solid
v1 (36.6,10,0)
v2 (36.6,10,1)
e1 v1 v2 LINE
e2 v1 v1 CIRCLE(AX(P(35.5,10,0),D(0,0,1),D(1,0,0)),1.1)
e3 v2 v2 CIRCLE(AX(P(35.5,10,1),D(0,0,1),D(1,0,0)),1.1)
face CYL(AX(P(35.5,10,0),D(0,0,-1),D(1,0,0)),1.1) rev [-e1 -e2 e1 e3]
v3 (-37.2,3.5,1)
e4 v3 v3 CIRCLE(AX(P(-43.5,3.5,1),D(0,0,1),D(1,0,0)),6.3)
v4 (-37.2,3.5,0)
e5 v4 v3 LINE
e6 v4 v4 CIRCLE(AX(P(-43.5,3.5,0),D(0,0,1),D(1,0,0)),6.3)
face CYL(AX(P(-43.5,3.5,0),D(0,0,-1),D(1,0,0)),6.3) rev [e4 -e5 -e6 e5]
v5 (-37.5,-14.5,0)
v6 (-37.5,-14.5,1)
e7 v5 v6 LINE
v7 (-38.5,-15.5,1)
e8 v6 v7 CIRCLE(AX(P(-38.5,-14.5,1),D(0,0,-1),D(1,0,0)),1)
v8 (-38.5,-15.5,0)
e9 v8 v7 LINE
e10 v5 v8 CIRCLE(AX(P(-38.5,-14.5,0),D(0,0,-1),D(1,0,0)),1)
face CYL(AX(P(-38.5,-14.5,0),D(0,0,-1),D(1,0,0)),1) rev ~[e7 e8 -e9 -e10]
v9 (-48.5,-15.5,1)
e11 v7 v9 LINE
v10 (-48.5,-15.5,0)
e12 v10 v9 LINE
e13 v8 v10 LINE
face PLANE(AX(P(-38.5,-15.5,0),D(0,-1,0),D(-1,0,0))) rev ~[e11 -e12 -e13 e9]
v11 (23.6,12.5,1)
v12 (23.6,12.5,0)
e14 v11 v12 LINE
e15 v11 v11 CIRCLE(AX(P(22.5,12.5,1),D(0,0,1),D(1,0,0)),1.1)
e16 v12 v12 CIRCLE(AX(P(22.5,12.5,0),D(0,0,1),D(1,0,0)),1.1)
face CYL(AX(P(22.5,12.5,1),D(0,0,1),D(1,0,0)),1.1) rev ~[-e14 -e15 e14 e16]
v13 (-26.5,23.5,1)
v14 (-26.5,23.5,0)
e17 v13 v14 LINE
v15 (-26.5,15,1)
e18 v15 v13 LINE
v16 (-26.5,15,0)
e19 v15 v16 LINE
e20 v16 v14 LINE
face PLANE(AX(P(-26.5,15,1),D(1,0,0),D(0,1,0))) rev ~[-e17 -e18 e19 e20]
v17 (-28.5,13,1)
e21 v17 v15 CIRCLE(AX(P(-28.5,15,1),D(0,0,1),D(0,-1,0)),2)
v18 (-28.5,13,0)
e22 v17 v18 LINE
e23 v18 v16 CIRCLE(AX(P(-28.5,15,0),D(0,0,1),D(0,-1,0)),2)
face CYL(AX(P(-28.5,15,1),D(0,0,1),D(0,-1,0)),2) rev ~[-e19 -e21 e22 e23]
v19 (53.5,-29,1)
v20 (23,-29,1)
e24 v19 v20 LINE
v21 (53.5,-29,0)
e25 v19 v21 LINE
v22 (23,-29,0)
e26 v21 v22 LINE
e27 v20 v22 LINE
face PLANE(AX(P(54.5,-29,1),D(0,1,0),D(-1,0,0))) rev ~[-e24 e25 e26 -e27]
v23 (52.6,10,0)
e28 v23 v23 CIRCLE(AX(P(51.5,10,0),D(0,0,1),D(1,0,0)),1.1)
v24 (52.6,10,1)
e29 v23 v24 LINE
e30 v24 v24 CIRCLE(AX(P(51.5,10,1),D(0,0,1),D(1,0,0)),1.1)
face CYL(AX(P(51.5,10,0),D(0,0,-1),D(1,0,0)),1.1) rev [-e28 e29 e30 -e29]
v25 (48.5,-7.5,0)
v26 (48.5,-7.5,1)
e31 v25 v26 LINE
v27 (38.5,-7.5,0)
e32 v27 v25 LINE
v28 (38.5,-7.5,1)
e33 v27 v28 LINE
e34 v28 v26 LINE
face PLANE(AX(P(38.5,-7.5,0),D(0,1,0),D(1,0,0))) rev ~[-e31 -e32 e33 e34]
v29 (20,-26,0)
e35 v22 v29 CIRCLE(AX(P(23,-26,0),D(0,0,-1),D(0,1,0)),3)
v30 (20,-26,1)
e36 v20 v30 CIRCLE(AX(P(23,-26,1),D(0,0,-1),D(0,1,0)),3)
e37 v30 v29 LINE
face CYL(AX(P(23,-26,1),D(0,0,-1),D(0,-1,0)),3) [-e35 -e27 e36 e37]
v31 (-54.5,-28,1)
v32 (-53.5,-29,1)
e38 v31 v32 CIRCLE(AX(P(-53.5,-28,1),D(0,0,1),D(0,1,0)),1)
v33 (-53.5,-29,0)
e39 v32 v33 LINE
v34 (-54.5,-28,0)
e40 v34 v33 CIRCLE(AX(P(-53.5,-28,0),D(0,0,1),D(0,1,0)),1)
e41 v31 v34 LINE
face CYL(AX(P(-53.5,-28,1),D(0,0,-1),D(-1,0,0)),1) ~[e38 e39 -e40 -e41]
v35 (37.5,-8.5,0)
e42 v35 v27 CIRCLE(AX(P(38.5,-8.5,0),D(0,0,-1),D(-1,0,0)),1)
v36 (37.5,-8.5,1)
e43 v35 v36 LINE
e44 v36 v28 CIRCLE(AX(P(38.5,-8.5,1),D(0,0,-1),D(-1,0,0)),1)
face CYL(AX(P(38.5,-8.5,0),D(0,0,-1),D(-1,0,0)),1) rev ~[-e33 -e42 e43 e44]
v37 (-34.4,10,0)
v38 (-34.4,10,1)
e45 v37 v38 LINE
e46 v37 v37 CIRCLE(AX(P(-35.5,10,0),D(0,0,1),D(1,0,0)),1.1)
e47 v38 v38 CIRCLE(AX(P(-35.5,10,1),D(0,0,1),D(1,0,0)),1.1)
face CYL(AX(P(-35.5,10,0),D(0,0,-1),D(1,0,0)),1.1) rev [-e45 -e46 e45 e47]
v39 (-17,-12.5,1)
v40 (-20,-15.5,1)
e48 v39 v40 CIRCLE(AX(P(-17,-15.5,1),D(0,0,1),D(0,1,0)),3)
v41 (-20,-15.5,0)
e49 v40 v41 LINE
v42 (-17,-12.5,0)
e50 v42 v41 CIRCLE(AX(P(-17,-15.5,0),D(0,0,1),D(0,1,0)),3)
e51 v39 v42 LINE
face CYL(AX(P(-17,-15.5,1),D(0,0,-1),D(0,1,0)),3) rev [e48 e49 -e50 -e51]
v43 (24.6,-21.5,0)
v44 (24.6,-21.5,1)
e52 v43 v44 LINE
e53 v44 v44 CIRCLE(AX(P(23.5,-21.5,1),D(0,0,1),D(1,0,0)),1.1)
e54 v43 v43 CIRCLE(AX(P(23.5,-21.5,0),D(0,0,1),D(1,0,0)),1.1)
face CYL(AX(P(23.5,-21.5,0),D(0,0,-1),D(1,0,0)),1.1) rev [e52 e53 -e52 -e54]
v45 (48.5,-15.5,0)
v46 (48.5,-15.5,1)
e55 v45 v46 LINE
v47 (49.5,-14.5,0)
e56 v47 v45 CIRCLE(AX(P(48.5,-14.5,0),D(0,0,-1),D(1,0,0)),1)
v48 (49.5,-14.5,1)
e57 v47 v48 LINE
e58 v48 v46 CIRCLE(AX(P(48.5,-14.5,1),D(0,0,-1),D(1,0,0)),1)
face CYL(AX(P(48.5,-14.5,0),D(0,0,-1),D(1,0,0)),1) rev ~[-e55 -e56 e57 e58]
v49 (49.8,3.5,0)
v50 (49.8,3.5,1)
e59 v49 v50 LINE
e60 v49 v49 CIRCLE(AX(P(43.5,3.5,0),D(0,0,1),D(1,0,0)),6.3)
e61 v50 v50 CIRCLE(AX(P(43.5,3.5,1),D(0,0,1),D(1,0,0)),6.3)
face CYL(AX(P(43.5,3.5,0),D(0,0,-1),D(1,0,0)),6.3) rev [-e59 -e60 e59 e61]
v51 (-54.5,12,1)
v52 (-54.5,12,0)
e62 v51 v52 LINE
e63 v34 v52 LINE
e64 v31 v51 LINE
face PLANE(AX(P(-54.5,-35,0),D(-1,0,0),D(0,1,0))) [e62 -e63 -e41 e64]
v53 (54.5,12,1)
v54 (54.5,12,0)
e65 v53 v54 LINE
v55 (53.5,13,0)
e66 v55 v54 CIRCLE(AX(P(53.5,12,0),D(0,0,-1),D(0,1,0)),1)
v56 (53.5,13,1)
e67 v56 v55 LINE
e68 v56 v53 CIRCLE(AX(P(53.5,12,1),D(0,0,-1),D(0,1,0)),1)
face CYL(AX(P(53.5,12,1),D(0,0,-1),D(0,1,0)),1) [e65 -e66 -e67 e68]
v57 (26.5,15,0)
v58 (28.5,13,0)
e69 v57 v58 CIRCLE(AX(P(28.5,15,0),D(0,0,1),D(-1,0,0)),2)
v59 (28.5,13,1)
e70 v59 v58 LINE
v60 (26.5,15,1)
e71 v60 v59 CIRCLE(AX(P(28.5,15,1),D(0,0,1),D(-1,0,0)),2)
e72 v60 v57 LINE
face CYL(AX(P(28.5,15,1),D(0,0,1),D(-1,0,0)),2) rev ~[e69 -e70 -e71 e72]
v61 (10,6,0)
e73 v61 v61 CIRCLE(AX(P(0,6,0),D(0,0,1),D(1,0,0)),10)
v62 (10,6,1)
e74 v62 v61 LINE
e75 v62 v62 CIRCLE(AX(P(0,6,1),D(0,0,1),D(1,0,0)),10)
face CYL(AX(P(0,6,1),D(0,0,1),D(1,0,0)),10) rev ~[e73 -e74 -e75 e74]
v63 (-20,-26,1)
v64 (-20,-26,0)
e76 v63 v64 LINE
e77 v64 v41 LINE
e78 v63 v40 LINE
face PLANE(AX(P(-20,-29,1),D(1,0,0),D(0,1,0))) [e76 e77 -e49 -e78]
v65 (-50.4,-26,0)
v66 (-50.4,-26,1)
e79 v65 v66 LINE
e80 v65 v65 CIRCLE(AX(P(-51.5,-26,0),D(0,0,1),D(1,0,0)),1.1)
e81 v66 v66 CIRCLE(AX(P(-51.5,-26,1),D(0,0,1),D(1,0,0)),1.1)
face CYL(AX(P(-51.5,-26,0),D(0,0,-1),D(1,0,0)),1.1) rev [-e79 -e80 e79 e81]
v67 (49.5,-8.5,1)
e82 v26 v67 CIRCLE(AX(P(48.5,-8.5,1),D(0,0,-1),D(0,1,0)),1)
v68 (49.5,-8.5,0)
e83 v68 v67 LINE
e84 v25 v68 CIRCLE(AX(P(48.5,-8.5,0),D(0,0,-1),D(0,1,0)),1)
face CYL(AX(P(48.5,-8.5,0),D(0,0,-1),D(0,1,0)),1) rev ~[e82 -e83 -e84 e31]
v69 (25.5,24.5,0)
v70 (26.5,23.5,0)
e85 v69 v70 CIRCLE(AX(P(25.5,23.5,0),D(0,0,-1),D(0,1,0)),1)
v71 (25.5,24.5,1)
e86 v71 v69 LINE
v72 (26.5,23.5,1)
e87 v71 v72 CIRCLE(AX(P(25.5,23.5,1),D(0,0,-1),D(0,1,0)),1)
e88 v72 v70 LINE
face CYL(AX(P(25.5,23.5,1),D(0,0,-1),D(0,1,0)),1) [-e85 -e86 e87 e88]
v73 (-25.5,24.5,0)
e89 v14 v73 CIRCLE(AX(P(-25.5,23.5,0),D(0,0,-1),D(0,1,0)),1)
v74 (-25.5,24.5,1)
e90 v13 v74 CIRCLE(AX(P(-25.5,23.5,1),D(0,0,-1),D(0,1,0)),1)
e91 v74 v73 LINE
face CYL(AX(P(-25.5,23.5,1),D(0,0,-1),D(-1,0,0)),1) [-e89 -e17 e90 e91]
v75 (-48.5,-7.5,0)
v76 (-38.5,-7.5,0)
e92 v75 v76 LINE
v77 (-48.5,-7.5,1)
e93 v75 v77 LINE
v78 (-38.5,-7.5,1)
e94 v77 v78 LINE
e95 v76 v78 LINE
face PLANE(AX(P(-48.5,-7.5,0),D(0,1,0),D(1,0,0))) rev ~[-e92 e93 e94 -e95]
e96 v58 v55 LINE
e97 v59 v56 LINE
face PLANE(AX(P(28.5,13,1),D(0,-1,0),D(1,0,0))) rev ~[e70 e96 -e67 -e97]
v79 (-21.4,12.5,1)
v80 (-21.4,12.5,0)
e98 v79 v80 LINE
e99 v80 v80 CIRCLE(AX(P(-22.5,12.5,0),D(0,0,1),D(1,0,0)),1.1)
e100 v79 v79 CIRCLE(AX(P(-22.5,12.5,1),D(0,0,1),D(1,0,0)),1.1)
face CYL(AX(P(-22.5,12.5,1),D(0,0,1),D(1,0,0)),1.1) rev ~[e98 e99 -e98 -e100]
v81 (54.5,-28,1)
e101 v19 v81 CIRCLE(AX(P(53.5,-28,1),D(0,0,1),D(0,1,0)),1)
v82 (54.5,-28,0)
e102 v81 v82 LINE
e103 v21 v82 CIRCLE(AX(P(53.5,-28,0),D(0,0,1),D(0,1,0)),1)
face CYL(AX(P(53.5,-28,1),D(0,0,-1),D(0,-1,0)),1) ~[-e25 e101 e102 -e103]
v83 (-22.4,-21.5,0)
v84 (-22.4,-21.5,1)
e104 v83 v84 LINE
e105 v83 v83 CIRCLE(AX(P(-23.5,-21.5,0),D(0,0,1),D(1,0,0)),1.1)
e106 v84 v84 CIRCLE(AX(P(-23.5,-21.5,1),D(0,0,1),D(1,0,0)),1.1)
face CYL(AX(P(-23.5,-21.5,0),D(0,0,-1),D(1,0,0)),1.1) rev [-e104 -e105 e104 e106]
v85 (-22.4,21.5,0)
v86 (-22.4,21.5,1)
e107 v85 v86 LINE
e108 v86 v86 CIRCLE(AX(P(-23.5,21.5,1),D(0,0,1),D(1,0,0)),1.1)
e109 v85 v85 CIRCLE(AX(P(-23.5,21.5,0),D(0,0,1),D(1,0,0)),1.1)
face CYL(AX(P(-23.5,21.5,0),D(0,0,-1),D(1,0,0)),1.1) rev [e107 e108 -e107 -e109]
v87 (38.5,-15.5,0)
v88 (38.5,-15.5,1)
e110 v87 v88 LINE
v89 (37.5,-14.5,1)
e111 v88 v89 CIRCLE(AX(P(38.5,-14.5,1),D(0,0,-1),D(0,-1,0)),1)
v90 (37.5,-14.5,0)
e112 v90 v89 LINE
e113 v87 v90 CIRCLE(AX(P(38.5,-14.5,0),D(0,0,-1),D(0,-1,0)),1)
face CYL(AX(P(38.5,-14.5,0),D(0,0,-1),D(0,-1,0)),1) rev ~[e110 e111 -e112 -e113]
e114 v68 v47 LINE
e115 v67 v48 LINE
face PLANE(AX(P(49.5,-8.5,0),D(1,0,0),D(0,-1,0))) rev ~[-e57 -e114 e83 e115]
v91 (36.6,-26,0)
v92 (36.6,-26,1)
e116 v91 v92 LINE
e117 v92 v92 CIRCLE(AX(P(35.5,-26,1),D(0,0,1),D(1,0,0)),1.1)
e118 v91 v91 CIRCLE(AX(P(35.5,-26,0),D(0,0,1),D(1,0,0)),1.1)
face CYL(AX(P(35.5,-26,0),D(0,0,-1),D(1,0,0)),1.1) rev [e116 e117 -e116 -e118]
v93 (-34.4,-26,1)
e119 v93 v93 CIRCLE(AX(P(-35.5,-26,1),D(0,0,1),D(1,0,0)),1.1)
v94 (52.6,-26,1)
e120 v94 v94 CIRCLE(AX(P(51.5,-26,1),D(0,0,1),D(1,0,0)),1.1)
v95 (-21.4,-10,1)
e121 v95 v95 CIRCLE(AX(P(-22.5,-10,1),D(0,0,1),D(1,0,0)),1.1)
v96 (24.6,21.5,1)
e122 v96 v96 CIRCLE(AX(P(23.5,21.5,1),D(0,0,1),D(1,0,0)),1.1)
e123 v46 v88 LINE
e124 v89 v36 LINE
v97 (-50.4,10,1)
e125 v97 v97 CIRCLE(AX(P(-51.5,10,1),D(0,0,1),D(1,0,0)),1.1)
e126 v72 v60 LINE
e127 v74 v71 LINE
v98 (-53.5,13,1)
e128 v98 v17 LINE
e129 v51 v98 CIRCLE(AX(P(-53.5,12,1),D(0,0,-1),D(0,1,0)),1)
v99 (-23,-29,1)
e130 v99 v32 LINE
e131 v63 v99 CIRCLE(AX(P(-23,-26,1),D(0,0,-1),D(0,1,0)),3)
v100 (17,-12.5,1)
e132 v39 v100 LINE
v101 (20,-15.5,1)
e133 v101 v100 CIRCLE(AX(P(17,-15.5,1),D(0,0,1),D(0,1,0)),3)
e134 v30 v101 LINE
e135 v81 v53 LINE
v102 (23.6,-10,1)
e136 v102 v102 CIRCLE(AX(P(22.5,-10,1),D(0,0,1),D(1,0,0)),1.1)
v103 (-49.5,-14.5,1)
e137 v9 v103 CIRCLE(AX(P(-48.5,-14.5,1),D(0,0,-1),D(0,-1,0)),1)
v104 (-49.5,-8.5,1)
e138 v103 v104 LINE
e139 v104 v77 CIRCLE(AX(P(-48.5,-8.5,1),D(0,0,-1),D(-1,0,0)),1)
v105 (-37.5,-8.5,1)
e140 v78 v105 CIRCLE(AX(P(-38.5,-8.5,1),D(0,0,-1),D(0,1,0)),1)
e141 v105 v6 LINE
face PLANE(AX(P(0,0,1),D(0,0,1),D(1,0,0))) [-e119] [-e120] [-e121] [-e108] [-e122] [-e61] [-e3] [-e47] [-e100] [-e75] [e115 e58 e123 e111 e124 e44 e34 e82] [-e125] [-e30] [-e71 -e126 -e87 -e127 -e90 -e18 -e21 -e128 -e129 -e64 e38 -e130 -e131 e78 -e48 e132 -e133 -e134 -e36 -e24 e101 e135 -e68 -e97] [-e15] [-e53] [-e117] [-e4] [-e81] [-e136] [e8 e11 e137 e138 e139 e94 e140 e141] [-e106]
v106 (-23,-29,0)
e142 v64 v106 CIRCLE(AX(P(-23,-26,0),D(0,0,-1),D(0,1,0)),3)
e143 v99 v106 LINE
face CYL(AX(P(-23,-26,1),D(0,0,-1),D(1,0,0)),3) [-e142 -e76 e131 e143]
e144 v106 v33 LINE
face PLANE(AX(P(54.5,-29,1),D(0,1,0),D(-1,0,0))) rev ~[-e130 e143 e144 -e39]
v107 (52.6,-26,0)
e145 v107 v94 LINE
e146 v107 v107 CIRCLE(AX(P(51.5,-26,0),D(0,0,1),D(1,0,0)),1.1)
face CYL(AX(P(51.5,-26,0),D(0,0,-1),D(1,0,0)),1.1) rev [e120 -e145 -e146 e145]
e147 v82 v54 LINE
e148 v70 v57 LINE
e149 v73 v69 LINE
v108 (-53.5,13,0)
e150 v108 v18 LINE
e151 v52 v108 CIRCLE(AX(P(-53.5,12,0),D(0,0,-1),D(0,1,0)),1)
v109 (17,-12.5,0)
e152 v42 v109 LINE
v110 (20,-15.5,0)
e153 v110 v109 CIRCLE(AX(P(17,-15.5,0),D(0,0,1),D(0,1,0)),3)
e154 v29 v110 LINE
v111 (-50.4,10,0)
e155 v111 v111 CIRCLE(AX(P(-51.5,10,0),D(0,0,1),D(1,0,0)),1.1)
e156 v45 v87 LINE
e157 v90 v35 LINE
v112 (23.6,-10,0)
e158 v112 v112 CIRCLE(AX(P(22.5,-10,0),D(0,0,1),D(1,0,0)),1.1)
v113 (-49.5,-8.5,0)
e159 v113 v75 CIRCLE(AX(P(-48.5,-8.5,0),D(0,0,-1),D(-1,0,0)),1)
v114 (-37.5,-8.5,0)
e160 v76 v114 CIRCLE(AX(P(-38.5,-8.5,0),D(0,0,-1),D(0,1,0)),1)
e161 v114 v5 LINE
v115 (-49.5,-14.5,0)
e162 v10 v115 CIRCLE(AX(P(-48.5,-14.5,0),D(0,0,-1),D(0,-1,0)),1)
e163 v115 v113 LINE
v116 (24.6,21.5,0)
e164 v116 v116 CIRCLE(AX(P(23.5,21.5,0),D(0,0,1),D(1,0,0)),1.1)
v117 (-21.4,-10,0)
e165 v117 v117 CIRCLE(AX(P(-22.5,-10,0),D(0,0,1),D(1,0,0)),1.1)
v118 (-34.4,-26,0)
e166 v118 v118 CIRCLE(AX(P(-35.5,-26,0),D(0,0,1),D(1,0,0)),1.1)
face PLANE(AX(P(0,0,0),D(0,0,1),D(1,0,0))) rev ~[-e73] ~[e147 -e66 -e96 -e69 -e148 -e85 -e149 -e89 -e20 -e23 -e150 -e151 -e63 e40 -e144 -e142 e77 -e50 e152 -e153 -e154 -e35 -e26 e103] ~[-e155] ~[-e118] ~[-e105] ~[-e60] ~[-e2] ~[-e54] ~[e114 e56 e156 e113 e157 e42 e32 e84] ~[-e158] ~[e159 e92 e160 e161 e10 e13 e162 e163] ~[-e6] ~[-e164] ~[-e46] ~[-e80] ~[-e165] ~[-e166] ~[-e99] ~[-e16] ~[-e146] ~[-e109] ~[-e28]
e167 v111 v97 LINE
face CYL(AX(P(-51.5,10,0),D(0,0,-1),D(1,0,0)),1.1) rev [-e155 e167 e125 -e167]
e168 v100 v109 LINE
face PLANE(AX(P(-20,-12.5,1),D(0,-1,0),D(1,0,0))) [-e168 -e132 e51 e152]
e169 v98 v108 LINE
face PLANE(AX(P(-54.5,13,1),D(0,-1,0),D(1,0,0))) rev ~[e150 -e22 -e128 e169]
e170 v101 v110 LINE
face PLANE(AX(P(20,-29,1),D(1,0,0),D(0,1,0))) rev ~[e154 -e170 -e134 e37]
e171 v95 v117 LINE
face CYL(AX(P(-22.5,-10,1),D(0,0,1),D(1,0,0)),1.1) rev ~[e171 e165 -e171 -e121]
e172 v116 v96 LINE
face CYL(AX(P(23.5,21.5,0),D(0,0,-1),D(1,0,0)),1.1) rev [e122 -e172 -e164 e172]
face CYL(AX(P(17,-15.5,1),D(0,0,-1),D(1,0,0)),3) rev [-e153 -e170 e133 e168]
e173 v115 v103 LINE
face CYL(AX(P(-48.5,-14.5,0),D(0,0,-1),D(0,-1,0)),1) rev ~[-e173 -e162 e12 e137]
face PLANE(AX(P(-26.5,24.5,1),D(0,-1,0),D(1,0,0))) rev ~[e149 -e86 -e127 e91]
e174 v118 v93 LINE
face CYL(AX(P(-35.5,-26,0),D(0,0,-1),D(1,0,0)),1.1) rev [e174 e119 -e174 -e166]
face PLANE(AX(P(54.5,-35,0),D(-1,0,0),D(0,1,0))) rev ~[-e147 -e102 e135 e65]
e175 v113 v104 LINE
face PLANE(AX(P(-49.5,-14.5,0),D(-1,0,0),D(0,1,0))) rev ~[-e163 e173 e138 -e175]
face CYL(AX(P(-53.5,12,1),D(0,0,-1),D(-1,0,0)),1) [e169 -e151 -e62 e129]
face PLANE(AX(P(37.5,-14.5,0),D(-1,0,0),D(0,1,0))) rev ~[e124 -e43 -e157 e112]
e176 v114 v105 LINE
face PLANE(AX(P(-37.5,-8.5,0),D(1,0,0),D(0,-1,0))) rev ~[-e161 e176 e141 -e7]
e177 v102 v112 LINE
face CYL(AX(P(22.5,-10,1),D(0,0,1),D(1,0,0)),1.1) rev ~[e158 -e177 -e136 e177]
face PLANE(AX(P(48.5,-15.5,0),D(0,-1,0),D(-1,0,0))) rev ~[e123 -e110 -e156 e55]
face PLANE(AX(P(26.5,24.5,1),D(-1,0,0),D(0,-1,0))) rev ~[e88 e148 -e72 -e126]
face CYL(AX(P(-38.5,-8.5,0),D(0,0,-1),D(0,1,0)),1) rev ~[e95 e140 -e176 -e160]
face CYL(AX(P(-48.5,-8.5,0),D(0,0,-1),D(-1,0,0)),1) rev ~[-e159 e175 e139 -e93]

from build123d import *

# Parameters (mm, degrees)
F0_W     = 109
F0_H     = 70
F0_R     = 1.1
F0_R_2   = 6.3
F1_DEPTH = 1
F2_W     = 53
F2_H     = 10.5
F3_DEPTH = 1
F5_DEPTH = 1
F6_R     = 1
F7_R     = 1.1
F7_W     = 40
F7_H     = 16.5
F7_R_2   = 10
F8_DEPTH = 1
F9_R     = 3


# Not quite as in the source:
# - a feature names something its author has since deleted; it is built from what else it names


with BuildPart() as f1:
    # F0 (on Top) → F1 (new body)
    with BuildSketch(Plane.XY):
        Rectangle(F0_W, F0_H)
        with Locations((-51.5, -26)):
            Circle(F0_R, mode=Mode.SUBTRACT)
        with Locations((-35.5, -26)):
            Circle(F0_R, mode=Mode.SUBTRACT)
        with Locations((-23.5, -21.5)):
            Circle(F0_R, mode=Mode.SUBTRACT)
        with BuildLine():
            ThreePointArc((-37.5, -14.5), (-37.7928932188, -15.2071067812), (-38.5, -15.5))
            Line((-38.5, -15.5), (-48.5, -15.5))
            ThreePointArc((-48.5, -15.5), (-49.2071067812, -15.2071067812), (-49.5, -14.5))
            Line((-49.5, -14.5), (-49.5, -8.5))
            ThreePointArc((-49.5, -8.5), (-49.2071067812, -7.7928932188), (-48.5, -7.5))
            Line((-48.5, -7.5), (-38.5, -7.5))
            ThreePointArc((-38.5, -7.5), (-37.7928932188, -7.7928932188), (-37.5, -8.5))
            Line((-37.5, -8.5), (-37.5, -14.5))
        make_face(mode=Mode.SUBTRACT)
        with Locations((23.5, -21.5)):
            Circle(F0_R, mode=Mode.SUBTRACT)
        with Locations((35.5, -26)):
            Circle(F0_R, mode=Mode.SUBTRACT)
        with Locations((51.5, -26)):
            Circle(F0_R, mode=Mode.SUBTRACT)
        with BuildLine():
            Line((38.5, -7.5), (48.5, -7.5))
            ThreePointArc((48.5, -7.5), (49.2071067812, -7.7928932188), (49.5, -8.5))
            Line((49.5, -8.5), (49.5, -14.5))
            ThreePointArc((49.5, -14.5), (49.2071067812, -15.2071067812), (48.5, -15.5))
            Line((48.5, -15.5), (38.5, -15.5))
            ThreePointArc((38.5, -15.5), (37.7928932188, -15.2071067812), (37.5, -14.5))
            Line((37.5, -14.5), (37.5, -8.5))
            ThreePointArc((37.5, -8.5), (37.7928932188, -7.7928932188), (38.5, -7.5))
        make_face(mode=Mode.SUBTRACT)
        with Locations((-43.5, 3.5)):
            Circle(F0_R_2, mode=Mode.SUBTRACT)
        with Locations((-51.5, 10)):
            Circle(F0_R, mode=Mode.SUBTRACT)
        with Locations((-35.5, 10)):
            Circle(F0_R, mode=Mode.SUBTRACT)
        with Locations((-23.5, 21.5)):
            Circle(F0_R, mode=Mode.SUBTRACT)
        with Locations((43.5, 3.5)):
            Circle(F0_R_2, mode=Mode.SUBTRACT)
        with Locations((35.5, 10)):
            Circle(F0_R, mode=Mode.SUBTRACT)
        with Locations((51.5, 10)):
            Circle(F0_R, mode=Mode.SUBTRACT)
        with Locations((23.5, 21.5)):
            Circle(F0_R, mode=Mode.SUBTRACT)
    extrude(amount=F1_DEPTH)

    # F2 (on face) → F3 (cut, through all)
    with BuildSketch(Plane.XY.offset(1)):
        with BuildLine():
            Line((-26.5, 35), (-54.5, 35))
            Line((-54.5, 35), (-54.5, 13))
            Line((-54.5, 13), (-28.5, 13))
            ThreePointArc((-28.5, 13), (-27.0857864376, 13.5857864376), (-26.5, 15))
            Line((-26.5, 15), (-26.5, 24.5))
            Line((-26.5, 24.5), (-26.5, 35))
        make_face()
        with Locations((0, 29.75)):
            Rectangle(F2_W, F2_H)
        with BuildLine():
            Line((54.5, 35), (26.5, 35))
            Line((26.5, 35), (26.5, 24.5))
            Line((26.5, 24.5), (26.5, 15))
            ThreePointArc((26.5, 15), (27.0857864376, 13.5857864376), (28.5, 13))
            Line((28.5, 13), (54.5, 13))
            Line((54.5, 13), (54.5, 35))
        make_face()
    extrude(amount=-F3_DEPTH, mode=Mode.SUBTRACT)

    # F4 (on face) → F5 (cut, through all)
    with BuildSketch(Plane.XY.offset(1)):
        Polygon((-54.5, -29), (-54.5, -35), (0, -35), (54.5, -35), (54.5, -29), (0, -29), align=None)
    extrude(amount=-F5_DEPTH, mode=Mode.SUBTRACT)

    # F6
    f6_edges = [f1.edges().sort_by_distance(p)[0] for p in [
        (-54.5, -29, 0.5),
        (54.5, -29, 0.5),
        (54.5, 13, 0.5),
        (26.5, 24.5, 0.5),
        (-26.5, 24.5, 0.5),
        (-54.5, 13, 0.5),
    ]]
    fillet(f6_edges, radius=F6_R)

    # F7 (on face) → F8 (cut, through all)
    with BuildSketch(Plane.XY.offset(1)):
        with Locations((-22.5, -10)):
            Circle(F7_R)
        with Locations((22.5, -10)):
            Circle(F7_R)
        with Locations((-22.5, 12.5)):
            Circle(F7_R)
        with Locations((22.5, 12.5)):
            Circle(F7_R)
        with Locations((0, -20.75)):
            Rectangle(F7_W, F7_H)
        with Locations((0, 6)):
            Circle(F7_R_2)
    extrude(amount=-F8_DEPTH, mode=Mode.SUBTRACT)

    # F9
    f9_edges = [f1.edges().sort_by_distance(p)[0] for p in [
        (-20, -29, 0.5),
        (-20, -12.5, 0.5),
        (20, -12.5, 0.5),
        (20, -29, 0.5),
    ]]
    fillet(f9_edges, radius=F9_R)


solid = f1.part
